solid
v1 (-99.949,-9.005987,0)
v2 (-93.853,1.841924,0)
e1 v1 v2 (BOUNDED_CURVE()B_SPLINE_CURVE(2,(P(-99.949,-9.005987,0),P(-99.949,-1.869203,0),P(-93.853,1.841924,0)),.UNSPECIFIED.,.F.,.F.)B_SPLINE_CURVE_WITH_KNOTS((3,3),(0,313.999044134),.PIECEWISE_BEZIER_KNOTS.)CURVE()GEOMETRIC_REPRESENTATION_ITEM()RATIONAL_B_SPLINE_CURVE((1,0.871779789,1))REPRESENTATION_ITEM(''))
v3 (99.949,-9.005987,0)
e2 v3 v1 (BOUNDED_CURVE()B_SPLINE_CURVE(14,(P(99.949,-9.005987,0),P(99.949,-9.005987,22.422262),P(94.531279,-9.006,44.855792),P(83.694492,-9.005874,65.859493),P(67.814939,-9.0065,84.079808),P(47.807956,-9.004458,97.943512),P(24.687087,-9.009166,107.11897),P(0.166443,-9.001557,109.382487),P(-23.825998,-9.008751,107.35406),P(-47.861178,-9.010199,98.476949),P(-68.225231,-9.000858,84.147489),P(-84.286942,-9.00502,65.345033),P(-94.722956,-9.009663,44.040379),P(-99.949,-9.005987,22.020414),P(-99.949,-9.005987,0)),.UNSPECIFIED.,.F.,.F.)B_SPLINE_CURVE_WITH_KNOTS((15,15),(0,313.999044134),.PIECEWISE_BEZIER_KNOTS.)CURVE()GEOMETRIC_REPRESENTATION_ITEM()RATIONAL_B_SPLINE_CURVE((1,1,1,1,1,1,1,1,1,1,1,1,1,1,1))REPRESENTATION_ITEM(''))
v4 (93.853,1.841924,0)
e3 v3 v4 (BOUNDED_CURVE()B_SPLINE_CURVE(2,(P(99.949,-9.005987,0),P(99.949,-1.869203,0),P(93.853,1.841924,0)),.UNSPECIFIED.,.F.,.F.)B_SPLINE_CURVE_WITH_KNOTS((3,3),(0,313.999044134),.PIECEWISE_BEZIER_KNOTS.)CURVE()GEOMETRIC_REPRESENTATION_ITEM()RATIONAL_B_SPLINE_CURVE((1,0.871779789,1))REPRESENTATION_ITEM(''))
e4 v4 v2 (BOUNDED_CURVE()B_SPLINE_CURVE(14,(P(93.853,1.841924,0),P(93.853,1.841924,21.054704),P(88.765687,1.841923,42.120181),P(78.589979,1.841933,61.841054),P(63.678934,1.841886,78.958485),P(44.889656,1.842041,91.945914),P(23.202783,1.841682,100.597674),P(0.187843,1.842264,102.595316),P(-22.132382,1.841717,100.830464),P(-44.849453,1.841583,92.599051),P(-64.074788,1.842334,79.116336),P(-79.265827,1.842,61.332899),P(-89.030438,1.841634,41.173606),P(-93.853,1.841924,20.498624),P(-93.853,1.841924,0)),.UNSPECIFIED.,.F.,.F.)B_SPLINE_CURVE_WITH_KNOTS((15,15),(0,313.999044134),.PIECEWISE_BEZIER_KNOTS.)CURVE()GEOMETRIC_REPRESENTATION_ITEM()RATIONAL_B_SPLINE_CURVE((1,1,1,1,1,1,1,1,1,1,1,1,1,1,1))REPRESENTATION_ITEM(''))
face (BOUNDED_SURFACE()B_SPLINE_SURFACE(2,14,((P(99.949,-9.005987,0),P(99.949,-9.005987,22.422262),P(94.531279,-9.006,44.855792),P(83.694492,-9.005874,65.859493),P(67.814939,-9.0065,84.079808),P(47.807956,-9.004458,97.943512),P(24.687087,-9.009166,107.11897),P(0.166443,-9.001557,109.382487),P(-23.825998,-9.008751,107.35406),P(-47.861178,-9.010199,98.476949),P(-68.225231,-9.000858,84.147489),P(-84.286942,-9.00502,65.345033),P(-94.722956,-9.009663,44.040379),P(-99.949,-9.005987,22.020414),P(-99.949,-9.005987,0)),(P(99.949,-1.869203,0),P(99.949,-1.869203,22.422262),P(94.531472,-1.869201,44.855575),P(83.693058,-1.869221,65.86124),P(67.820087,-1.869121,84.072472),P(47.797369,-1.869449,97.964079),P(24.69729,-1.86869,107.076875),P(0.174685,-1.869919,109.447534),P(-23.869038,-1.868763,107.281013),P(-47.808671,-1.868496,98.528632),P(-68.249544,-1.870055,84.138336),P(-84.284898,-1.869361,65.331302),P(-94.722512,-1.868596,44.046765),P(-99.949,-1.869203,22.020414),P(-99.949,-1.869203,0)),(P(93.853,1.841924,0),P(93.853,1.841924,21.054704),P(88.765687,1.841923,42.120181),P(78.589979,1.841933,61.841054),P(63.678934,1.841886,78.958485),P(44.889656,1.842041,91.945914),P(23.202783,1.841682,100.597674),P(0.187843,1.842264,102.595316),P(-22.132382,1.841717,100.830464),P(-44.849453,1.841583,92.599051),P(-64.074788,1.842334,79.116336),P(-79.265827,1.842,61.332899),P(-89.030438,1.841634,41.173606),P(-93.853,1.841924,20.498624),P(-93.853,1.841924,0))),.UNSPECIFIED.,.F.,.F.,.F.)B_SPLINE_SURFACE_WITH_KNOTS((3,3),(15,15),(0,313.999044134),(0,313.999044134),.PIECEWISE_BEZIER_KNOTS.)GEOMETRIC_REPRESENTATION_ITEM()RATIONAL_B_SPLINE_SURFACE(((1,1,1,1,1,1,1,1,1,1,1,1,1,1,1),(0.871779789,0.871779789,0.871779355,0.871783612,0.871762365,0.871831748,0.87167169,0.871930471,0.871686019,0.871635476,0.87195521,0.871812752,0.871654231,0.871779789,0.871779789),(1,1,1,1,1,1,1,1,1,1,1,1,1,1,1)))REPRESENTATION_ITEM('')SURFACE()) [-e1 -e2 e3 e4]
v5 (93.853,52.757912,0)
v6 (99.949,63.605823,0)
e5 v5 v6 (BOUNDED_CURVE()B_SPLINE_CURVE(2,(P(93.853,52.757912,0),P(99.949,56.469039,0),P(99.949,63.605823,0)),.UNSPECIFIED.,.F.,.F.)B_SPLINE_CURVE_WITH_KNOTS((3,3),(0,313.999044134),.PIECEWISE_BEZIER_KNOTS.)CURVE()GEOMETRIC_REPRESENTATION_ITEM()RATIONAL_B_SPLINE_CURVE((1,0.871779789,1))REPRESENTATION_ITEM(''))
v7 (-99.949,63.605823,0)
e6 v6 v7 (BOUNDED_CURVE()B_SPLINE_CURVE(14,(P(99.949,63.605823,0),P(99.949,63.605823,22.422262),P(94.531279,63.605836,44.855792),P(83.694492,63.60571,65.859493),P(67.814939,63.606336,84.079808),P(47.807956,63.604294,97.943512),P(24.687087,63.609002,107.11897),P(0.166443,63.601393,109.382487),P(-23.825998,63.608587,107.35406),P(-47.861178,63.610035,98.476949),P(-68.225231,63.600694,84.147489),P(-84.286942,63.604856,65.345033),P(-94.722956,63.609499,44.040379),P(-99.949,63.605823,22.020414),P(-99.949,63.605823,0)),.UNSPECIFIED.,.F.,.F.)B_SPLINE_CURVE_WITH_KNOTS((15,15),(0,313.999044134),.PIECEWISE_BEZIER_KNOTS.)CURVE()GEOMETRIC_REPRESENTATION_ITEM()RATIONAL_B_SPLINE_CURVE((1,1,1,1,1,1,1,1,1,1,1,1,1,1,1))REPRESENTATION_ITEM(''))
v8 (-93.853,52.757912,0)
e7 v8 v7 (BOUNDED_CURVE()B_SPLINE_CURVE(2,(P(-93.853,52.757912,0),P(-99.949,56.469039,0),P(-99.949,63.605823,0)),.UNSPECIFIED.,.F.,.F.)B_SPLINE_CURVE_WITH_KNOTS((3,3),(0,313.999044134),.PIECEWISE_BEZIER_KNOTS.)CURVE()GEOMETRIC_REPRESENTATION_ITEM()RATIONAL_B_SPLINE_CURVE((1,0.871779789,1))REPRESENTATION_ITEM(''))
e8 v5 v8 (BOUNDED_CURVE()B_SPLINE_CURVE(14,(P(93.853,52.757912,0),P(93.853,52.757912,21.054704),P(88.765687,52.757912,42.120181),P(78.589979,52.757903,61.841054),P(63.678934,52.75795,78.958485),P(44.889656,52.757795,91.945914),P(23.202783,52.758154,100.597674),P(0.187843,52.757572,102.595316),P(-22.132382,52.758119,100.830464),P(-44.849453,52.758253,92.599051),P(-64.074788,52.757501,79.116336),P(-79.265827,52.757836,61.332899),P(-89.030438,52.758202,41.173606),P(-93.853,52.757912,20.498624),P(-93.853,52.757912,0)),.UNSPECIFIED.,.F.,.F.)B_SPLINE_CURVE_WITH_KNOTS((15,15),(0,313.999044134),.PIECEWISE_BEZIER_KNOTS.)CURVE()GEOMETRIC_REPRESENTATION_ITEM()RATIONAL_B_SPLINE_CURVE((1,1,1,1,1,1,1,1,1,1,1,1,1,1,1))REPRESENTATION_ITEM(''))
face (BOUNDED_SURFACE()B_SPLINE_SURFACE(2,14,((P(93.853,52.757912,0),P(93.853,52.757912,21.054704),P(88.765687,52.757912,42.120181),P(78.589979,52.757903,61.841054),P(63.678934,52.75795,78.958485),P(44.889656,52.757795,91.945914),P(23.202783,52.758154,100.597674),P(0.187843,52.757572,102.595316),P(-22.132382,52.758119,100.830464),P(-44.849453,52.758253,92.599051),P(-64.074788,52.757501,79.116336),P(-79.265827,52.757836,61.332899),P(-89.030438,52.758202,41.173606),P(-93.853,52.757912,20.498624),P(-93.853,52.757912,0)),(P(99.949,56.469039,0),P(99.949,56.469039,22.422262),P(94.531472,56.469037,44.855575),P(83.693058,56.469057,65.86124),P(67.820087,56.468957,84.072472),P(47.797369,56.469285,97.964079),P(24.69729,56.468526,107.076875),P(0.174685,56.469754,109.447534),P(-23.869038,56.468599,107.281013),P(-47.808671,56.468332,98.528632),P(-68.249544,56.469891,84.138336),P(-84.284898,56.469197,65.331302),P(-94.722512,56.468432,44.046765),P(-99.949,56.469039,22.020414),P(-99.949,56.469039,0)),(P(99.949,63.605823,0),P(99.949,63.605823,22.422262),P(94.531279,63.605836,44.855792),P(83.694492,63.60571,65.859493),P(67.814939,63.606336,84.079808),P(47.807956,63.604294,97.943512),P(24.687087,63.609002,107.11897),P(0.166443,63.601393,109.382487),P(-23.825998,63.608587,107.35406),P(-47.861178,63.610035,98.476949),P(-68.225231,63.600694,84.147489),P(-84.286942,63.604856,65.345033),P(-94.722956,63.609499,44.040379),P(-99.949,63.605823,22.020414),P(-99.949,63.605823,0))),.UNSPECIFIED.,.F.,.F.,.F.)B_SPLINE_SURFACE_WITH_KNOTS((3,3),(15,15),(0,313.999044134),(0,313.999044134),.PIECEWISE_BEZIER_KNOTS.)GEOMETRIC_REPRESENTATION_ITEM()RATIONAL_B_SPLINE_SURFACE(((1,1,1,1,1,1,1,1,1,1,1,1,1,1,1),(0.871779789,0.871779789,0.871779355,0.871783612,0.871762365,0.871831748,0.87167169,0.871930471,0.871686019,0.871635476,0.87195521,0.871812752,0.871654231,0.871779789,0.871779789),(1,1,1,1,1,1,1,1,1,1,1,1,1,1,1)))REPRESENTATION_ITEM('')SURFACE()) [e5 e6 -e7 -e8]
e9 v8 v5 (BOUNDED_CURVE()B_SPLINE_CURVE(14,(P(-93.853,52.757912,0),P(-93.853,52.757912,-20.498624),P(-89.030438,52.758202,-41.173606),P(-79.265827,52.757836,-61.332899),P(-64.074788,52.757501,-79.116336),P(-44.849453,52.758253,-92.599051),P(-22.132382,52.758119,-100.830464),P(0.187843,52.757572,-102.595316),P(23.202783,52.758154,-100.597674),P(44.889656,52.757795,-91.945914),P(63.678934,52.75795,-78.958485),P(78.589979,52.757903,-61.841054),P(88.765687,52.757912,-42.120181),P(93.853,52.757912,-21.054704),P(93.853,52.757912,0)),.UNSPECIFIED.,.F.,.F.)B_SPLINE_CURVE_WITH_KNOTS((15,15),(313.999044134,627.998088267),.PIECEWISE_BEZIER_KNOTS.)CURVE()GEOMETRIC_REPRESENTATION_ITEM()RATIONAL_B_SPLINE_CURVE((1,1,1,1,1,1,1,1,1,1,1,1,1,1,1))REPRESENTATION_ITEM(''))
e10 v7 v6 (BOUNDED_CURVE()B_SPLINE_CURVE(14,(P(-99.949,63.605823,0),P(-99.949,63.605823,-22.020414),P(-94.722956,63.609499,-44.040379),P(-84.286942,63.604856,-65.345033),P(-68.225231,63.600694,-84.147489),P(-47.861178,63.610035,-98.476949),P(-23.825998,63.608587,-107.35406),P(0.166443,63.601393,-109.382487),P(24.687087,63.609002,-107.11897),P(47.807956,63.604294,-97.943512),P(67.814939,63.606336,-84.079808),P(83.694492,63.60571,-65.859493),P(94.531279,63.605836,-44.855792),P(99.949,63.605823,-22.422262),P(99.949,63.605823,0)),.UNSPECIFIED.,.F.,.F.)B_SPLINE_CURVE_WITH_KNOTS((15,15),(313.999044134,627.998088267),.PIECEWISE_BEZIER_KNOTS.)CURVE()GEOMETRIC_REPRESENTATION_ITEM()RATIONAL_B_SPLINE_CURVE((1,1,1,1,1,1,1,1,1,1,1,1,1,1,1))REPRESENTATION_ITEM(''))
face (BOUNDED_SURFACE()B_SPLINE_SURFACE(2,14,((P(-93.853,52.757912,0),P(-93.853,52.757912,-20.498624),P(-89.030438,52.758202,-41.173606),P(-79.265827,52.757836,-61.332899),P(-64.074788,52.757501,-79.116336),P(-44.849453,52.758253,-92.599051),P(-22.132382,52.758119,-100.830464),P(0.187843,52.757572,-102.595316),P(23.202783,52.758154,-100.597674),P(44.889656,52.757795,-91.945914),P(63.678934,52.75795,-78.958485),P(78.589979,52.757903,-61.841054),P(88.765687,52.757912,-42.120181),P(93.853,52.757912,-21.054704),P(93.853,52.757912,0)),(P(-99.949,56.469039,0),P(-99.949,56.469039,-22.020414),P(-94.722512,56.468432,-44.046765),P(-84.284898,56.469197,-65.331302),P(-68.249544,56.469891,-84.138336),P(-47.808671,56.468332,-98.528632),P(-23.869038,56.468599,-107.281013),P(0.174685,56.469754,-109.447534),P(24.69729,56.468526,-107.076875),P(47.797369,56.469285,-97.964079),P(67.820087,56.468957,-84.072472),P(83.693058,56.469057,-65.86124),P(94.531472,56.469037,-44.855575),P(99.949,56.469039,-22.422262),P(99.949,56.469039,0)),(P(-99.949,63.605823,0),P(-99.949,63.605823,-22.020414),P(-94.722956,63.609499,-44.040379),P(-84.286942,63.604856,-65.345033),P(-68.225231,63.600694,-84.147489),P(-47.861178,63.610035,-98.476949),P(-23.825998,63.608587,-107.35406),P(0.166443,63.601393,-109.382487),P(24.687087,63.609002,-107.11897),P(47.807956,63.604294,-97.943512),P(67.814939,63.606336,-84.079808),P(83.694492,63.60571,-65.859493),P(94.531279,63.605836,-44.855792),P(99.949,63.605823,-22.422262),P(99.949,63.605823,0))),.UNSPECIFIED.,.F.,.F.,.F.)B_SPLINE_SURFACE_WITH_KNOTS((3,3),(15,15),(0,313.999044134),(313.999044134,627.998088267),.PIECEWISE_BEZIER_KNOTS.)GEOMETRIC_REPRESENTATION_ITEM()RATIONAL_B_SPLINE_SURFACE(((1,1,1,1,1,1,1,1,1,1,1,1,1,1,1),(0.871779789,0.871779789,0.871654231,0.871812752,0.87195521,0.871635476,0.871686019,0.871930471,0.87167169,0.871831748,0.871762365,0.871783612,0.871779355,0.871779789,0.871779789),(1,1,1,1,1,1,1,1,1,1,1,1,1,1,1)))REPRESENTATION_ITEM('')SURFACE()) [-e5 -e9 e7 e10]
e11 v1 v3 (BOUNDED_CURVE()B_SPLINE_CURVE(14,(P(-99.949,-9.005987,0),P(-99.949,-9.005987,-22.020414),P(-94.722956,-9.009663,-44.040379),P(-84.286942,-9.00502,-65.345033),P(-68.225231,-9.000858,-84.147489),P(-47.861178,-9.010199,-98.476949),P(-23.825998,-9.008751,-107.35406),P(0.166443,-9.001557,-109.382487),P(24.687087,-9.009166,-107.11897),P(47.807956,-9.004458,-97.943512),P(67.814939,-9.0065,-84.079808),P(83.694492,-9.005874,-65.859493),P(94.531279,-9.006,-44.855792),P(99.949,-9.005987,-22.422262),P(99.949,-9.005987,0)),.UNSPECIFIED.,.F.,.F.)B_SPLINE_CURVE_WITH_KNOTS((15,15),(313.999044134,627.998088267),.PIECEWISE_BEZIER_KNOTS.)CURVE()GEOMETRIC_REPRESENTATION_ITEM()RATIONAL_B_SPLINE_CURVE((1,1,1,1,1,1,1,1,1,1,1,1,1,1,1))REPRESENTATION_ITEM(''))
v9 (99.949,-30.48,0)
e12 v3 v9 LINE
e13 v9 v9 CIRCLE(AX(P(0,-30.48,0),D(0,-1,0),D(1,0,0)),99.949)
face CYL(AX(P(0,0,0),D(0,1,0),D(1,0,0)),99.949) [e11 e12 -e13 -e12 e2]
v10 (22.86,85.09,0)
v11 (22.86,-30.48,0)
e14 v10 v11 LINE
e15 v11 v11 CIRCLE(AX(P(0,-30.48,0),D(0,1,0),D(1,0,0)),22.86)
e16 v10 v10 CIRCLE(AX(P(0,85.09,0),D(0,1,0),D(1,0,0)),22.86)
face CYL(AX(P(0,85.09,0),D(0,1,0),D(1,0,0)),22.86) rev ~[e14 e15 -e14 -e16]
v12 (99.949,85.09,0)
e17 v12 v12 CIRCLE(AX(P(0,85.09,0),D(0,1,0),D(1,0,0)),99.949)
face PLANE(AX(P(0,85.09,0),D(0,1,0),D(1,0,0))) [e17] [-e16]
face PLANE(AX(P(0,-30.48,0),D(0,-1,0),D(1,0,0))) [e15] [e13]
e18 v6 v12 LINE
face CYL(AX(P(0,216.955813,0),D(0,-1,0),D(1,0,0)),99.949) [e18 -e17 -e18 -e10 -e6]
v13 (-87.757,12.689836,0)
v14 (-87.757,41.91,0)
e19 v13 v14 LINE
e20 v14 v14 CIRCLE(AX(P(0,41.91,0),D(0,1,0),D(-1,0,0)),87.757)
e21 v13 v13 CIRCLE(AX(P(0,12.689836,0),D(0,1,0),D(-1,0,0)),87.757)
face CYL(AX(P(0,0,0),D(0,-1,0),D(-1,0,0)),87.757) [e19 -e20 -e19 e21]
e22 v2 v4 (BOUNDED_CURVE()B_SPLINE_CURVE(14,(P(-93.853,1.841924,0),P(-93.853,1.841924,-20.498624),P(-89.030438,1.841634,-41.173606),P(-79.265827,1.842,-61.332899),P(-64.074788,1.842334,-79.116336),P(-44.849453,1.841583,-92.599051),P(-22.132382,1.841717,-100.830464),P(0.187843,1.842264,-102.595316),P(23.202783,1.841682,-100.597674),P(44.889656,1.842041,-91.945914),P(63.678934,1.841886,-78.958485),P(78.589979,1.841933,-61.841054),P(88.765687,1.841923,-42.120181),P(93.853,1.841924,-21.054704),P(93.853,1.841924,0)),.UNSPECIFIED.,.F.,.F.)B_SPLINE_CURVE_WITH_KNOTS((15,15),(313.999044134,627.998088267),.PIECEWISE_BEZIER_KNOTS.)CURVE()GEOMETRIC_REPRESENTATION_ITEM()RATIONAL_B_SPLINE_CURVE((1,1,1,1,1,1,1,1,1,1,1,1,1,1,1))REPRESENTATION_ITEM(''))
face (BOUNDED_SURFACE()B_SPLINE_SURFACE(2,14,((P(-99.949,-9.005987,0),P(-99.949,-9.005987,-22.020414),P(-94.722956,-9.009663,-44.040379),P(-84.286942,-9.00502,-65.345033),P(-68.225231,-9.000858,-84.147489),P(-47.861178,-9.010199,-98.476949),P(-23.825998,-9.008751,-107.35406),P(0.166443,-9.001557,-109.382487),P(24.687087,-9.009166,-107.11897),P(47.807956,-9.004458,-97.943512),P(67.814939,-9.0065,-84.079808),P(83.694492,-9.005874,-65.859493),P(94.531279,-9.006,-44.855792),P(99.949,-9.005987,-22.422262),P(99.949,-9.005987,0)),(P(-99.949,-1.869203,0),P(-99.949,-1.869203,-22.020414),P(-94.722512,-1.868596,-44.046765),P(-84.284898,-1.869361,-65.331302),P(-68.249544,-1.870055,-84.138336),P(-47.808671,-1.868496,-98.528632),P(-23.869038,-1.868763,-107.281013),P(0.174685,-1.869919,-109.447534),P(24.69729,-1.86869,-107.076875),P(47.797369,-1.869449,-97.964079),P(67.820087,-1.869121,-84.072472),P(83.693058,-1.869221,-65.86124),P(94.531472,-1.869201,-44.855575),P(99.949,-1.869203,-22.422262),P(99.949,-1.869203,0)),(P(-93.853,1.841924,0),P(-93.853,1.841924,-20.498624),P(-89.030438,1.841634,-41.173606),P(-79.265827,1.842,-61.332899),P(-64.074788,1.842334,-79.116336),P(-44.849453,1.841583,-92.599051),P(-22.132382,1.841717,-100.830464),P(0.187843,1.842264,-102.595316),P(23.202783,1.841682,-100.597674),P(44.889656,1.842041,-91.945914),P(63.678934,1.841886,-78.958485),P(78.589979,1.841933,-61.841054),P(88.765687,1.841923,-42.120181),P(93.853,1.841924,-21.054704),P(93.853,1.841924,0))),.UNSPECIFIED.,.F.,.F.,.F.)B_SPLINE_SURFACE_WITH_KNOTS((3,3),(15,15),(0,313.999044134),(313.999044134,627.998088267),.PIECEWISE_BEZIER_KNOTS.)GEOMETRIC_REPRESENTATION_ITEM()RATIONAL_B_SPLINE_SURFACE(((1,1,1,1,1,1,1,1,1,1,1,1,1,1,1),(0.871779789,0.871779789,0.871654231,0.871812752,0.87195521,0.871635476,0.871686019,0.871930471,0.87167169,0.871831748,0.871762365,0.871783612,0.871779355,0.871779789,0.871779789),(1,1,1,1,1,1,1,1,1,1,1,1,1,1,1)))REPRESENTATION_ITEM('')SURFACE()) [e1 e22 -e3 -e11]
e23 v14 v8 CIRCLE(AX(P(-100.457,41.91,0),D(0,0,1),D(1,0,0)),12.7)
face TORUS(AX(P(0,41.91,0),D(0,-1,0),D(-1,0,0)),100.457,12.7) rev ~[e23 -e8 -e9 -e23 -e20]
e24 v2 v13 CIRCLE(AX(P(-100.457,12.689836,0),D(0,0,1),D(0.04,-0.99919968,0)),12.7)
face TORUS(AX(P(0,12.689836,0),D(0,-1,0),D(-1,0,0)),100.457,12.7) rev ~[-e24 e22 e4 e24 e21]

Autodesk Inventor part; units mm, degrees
ref_plane "YZ Plane" through (0, 0, 0) normal (1, 0, 0) x (0, 1, 0)
ref_plane "XZ Plane" through (0, 0, 0) normal (0, 1, 0) x (-1, 0, 0)
ref_plane "XY Plane" through (0, 0, 0) normal (0, 0, 1) x (1, 0, 0)
sketch "Sketch1" plane through (0, 0, 0) normal (0, 1, 0) x (-1, 0, 0)
  circle A0 centre (0, 0) radius 87.757
  dimension "d0" = 175.514
extrude "Extrusion1" add sketch "Sketch1" along normal blind 54.61
sketch "Sketch2" plane through (0, 54.61, 0) normal (0, 1, 0) x (1, 0, 0)
  circle A0 centre (0, 0) radius 99.949
  dimension "d3" = 199.898
sketch "Sketch3" plane through (0, 0, 0) normal (0, -1, 0) x (1, 0, 0)
  circle A0 centre (0, 0) radius 99.949
  dimension "d4" = 199.898
extrude "Extrusion2" add sketch "Sketch2" along normal blind 30.48
extrude "Extrusion3" add sketch "Sketch3" along normal blind 30.48
sketch "Sketch4" plane through (0, 85.09, 0) normal (0, 1, 0) x (1, 0, 0)
  circle A0 centre (0, 0) radius 22.86
  dimension "d9" = 45.72
extrude "Extrusion4" cut sketch "Sketch4" against normal blind 115.57
fillet "Fillet1" radius 12.7 1 edges at (87.757, 54.61, 0)
fillet "Fillet2" radius 12.7 1 edges at (87.757, 0, 0)
fillet "Fillet3" radius 12.7 4 edges at (0, 0, 99.949) (0, 0, -99.949) (0, 54.5998, 99.949) (0, 54.5998, -99.949)
properties part number "Pulley" material "Acetal Resin, Black"
